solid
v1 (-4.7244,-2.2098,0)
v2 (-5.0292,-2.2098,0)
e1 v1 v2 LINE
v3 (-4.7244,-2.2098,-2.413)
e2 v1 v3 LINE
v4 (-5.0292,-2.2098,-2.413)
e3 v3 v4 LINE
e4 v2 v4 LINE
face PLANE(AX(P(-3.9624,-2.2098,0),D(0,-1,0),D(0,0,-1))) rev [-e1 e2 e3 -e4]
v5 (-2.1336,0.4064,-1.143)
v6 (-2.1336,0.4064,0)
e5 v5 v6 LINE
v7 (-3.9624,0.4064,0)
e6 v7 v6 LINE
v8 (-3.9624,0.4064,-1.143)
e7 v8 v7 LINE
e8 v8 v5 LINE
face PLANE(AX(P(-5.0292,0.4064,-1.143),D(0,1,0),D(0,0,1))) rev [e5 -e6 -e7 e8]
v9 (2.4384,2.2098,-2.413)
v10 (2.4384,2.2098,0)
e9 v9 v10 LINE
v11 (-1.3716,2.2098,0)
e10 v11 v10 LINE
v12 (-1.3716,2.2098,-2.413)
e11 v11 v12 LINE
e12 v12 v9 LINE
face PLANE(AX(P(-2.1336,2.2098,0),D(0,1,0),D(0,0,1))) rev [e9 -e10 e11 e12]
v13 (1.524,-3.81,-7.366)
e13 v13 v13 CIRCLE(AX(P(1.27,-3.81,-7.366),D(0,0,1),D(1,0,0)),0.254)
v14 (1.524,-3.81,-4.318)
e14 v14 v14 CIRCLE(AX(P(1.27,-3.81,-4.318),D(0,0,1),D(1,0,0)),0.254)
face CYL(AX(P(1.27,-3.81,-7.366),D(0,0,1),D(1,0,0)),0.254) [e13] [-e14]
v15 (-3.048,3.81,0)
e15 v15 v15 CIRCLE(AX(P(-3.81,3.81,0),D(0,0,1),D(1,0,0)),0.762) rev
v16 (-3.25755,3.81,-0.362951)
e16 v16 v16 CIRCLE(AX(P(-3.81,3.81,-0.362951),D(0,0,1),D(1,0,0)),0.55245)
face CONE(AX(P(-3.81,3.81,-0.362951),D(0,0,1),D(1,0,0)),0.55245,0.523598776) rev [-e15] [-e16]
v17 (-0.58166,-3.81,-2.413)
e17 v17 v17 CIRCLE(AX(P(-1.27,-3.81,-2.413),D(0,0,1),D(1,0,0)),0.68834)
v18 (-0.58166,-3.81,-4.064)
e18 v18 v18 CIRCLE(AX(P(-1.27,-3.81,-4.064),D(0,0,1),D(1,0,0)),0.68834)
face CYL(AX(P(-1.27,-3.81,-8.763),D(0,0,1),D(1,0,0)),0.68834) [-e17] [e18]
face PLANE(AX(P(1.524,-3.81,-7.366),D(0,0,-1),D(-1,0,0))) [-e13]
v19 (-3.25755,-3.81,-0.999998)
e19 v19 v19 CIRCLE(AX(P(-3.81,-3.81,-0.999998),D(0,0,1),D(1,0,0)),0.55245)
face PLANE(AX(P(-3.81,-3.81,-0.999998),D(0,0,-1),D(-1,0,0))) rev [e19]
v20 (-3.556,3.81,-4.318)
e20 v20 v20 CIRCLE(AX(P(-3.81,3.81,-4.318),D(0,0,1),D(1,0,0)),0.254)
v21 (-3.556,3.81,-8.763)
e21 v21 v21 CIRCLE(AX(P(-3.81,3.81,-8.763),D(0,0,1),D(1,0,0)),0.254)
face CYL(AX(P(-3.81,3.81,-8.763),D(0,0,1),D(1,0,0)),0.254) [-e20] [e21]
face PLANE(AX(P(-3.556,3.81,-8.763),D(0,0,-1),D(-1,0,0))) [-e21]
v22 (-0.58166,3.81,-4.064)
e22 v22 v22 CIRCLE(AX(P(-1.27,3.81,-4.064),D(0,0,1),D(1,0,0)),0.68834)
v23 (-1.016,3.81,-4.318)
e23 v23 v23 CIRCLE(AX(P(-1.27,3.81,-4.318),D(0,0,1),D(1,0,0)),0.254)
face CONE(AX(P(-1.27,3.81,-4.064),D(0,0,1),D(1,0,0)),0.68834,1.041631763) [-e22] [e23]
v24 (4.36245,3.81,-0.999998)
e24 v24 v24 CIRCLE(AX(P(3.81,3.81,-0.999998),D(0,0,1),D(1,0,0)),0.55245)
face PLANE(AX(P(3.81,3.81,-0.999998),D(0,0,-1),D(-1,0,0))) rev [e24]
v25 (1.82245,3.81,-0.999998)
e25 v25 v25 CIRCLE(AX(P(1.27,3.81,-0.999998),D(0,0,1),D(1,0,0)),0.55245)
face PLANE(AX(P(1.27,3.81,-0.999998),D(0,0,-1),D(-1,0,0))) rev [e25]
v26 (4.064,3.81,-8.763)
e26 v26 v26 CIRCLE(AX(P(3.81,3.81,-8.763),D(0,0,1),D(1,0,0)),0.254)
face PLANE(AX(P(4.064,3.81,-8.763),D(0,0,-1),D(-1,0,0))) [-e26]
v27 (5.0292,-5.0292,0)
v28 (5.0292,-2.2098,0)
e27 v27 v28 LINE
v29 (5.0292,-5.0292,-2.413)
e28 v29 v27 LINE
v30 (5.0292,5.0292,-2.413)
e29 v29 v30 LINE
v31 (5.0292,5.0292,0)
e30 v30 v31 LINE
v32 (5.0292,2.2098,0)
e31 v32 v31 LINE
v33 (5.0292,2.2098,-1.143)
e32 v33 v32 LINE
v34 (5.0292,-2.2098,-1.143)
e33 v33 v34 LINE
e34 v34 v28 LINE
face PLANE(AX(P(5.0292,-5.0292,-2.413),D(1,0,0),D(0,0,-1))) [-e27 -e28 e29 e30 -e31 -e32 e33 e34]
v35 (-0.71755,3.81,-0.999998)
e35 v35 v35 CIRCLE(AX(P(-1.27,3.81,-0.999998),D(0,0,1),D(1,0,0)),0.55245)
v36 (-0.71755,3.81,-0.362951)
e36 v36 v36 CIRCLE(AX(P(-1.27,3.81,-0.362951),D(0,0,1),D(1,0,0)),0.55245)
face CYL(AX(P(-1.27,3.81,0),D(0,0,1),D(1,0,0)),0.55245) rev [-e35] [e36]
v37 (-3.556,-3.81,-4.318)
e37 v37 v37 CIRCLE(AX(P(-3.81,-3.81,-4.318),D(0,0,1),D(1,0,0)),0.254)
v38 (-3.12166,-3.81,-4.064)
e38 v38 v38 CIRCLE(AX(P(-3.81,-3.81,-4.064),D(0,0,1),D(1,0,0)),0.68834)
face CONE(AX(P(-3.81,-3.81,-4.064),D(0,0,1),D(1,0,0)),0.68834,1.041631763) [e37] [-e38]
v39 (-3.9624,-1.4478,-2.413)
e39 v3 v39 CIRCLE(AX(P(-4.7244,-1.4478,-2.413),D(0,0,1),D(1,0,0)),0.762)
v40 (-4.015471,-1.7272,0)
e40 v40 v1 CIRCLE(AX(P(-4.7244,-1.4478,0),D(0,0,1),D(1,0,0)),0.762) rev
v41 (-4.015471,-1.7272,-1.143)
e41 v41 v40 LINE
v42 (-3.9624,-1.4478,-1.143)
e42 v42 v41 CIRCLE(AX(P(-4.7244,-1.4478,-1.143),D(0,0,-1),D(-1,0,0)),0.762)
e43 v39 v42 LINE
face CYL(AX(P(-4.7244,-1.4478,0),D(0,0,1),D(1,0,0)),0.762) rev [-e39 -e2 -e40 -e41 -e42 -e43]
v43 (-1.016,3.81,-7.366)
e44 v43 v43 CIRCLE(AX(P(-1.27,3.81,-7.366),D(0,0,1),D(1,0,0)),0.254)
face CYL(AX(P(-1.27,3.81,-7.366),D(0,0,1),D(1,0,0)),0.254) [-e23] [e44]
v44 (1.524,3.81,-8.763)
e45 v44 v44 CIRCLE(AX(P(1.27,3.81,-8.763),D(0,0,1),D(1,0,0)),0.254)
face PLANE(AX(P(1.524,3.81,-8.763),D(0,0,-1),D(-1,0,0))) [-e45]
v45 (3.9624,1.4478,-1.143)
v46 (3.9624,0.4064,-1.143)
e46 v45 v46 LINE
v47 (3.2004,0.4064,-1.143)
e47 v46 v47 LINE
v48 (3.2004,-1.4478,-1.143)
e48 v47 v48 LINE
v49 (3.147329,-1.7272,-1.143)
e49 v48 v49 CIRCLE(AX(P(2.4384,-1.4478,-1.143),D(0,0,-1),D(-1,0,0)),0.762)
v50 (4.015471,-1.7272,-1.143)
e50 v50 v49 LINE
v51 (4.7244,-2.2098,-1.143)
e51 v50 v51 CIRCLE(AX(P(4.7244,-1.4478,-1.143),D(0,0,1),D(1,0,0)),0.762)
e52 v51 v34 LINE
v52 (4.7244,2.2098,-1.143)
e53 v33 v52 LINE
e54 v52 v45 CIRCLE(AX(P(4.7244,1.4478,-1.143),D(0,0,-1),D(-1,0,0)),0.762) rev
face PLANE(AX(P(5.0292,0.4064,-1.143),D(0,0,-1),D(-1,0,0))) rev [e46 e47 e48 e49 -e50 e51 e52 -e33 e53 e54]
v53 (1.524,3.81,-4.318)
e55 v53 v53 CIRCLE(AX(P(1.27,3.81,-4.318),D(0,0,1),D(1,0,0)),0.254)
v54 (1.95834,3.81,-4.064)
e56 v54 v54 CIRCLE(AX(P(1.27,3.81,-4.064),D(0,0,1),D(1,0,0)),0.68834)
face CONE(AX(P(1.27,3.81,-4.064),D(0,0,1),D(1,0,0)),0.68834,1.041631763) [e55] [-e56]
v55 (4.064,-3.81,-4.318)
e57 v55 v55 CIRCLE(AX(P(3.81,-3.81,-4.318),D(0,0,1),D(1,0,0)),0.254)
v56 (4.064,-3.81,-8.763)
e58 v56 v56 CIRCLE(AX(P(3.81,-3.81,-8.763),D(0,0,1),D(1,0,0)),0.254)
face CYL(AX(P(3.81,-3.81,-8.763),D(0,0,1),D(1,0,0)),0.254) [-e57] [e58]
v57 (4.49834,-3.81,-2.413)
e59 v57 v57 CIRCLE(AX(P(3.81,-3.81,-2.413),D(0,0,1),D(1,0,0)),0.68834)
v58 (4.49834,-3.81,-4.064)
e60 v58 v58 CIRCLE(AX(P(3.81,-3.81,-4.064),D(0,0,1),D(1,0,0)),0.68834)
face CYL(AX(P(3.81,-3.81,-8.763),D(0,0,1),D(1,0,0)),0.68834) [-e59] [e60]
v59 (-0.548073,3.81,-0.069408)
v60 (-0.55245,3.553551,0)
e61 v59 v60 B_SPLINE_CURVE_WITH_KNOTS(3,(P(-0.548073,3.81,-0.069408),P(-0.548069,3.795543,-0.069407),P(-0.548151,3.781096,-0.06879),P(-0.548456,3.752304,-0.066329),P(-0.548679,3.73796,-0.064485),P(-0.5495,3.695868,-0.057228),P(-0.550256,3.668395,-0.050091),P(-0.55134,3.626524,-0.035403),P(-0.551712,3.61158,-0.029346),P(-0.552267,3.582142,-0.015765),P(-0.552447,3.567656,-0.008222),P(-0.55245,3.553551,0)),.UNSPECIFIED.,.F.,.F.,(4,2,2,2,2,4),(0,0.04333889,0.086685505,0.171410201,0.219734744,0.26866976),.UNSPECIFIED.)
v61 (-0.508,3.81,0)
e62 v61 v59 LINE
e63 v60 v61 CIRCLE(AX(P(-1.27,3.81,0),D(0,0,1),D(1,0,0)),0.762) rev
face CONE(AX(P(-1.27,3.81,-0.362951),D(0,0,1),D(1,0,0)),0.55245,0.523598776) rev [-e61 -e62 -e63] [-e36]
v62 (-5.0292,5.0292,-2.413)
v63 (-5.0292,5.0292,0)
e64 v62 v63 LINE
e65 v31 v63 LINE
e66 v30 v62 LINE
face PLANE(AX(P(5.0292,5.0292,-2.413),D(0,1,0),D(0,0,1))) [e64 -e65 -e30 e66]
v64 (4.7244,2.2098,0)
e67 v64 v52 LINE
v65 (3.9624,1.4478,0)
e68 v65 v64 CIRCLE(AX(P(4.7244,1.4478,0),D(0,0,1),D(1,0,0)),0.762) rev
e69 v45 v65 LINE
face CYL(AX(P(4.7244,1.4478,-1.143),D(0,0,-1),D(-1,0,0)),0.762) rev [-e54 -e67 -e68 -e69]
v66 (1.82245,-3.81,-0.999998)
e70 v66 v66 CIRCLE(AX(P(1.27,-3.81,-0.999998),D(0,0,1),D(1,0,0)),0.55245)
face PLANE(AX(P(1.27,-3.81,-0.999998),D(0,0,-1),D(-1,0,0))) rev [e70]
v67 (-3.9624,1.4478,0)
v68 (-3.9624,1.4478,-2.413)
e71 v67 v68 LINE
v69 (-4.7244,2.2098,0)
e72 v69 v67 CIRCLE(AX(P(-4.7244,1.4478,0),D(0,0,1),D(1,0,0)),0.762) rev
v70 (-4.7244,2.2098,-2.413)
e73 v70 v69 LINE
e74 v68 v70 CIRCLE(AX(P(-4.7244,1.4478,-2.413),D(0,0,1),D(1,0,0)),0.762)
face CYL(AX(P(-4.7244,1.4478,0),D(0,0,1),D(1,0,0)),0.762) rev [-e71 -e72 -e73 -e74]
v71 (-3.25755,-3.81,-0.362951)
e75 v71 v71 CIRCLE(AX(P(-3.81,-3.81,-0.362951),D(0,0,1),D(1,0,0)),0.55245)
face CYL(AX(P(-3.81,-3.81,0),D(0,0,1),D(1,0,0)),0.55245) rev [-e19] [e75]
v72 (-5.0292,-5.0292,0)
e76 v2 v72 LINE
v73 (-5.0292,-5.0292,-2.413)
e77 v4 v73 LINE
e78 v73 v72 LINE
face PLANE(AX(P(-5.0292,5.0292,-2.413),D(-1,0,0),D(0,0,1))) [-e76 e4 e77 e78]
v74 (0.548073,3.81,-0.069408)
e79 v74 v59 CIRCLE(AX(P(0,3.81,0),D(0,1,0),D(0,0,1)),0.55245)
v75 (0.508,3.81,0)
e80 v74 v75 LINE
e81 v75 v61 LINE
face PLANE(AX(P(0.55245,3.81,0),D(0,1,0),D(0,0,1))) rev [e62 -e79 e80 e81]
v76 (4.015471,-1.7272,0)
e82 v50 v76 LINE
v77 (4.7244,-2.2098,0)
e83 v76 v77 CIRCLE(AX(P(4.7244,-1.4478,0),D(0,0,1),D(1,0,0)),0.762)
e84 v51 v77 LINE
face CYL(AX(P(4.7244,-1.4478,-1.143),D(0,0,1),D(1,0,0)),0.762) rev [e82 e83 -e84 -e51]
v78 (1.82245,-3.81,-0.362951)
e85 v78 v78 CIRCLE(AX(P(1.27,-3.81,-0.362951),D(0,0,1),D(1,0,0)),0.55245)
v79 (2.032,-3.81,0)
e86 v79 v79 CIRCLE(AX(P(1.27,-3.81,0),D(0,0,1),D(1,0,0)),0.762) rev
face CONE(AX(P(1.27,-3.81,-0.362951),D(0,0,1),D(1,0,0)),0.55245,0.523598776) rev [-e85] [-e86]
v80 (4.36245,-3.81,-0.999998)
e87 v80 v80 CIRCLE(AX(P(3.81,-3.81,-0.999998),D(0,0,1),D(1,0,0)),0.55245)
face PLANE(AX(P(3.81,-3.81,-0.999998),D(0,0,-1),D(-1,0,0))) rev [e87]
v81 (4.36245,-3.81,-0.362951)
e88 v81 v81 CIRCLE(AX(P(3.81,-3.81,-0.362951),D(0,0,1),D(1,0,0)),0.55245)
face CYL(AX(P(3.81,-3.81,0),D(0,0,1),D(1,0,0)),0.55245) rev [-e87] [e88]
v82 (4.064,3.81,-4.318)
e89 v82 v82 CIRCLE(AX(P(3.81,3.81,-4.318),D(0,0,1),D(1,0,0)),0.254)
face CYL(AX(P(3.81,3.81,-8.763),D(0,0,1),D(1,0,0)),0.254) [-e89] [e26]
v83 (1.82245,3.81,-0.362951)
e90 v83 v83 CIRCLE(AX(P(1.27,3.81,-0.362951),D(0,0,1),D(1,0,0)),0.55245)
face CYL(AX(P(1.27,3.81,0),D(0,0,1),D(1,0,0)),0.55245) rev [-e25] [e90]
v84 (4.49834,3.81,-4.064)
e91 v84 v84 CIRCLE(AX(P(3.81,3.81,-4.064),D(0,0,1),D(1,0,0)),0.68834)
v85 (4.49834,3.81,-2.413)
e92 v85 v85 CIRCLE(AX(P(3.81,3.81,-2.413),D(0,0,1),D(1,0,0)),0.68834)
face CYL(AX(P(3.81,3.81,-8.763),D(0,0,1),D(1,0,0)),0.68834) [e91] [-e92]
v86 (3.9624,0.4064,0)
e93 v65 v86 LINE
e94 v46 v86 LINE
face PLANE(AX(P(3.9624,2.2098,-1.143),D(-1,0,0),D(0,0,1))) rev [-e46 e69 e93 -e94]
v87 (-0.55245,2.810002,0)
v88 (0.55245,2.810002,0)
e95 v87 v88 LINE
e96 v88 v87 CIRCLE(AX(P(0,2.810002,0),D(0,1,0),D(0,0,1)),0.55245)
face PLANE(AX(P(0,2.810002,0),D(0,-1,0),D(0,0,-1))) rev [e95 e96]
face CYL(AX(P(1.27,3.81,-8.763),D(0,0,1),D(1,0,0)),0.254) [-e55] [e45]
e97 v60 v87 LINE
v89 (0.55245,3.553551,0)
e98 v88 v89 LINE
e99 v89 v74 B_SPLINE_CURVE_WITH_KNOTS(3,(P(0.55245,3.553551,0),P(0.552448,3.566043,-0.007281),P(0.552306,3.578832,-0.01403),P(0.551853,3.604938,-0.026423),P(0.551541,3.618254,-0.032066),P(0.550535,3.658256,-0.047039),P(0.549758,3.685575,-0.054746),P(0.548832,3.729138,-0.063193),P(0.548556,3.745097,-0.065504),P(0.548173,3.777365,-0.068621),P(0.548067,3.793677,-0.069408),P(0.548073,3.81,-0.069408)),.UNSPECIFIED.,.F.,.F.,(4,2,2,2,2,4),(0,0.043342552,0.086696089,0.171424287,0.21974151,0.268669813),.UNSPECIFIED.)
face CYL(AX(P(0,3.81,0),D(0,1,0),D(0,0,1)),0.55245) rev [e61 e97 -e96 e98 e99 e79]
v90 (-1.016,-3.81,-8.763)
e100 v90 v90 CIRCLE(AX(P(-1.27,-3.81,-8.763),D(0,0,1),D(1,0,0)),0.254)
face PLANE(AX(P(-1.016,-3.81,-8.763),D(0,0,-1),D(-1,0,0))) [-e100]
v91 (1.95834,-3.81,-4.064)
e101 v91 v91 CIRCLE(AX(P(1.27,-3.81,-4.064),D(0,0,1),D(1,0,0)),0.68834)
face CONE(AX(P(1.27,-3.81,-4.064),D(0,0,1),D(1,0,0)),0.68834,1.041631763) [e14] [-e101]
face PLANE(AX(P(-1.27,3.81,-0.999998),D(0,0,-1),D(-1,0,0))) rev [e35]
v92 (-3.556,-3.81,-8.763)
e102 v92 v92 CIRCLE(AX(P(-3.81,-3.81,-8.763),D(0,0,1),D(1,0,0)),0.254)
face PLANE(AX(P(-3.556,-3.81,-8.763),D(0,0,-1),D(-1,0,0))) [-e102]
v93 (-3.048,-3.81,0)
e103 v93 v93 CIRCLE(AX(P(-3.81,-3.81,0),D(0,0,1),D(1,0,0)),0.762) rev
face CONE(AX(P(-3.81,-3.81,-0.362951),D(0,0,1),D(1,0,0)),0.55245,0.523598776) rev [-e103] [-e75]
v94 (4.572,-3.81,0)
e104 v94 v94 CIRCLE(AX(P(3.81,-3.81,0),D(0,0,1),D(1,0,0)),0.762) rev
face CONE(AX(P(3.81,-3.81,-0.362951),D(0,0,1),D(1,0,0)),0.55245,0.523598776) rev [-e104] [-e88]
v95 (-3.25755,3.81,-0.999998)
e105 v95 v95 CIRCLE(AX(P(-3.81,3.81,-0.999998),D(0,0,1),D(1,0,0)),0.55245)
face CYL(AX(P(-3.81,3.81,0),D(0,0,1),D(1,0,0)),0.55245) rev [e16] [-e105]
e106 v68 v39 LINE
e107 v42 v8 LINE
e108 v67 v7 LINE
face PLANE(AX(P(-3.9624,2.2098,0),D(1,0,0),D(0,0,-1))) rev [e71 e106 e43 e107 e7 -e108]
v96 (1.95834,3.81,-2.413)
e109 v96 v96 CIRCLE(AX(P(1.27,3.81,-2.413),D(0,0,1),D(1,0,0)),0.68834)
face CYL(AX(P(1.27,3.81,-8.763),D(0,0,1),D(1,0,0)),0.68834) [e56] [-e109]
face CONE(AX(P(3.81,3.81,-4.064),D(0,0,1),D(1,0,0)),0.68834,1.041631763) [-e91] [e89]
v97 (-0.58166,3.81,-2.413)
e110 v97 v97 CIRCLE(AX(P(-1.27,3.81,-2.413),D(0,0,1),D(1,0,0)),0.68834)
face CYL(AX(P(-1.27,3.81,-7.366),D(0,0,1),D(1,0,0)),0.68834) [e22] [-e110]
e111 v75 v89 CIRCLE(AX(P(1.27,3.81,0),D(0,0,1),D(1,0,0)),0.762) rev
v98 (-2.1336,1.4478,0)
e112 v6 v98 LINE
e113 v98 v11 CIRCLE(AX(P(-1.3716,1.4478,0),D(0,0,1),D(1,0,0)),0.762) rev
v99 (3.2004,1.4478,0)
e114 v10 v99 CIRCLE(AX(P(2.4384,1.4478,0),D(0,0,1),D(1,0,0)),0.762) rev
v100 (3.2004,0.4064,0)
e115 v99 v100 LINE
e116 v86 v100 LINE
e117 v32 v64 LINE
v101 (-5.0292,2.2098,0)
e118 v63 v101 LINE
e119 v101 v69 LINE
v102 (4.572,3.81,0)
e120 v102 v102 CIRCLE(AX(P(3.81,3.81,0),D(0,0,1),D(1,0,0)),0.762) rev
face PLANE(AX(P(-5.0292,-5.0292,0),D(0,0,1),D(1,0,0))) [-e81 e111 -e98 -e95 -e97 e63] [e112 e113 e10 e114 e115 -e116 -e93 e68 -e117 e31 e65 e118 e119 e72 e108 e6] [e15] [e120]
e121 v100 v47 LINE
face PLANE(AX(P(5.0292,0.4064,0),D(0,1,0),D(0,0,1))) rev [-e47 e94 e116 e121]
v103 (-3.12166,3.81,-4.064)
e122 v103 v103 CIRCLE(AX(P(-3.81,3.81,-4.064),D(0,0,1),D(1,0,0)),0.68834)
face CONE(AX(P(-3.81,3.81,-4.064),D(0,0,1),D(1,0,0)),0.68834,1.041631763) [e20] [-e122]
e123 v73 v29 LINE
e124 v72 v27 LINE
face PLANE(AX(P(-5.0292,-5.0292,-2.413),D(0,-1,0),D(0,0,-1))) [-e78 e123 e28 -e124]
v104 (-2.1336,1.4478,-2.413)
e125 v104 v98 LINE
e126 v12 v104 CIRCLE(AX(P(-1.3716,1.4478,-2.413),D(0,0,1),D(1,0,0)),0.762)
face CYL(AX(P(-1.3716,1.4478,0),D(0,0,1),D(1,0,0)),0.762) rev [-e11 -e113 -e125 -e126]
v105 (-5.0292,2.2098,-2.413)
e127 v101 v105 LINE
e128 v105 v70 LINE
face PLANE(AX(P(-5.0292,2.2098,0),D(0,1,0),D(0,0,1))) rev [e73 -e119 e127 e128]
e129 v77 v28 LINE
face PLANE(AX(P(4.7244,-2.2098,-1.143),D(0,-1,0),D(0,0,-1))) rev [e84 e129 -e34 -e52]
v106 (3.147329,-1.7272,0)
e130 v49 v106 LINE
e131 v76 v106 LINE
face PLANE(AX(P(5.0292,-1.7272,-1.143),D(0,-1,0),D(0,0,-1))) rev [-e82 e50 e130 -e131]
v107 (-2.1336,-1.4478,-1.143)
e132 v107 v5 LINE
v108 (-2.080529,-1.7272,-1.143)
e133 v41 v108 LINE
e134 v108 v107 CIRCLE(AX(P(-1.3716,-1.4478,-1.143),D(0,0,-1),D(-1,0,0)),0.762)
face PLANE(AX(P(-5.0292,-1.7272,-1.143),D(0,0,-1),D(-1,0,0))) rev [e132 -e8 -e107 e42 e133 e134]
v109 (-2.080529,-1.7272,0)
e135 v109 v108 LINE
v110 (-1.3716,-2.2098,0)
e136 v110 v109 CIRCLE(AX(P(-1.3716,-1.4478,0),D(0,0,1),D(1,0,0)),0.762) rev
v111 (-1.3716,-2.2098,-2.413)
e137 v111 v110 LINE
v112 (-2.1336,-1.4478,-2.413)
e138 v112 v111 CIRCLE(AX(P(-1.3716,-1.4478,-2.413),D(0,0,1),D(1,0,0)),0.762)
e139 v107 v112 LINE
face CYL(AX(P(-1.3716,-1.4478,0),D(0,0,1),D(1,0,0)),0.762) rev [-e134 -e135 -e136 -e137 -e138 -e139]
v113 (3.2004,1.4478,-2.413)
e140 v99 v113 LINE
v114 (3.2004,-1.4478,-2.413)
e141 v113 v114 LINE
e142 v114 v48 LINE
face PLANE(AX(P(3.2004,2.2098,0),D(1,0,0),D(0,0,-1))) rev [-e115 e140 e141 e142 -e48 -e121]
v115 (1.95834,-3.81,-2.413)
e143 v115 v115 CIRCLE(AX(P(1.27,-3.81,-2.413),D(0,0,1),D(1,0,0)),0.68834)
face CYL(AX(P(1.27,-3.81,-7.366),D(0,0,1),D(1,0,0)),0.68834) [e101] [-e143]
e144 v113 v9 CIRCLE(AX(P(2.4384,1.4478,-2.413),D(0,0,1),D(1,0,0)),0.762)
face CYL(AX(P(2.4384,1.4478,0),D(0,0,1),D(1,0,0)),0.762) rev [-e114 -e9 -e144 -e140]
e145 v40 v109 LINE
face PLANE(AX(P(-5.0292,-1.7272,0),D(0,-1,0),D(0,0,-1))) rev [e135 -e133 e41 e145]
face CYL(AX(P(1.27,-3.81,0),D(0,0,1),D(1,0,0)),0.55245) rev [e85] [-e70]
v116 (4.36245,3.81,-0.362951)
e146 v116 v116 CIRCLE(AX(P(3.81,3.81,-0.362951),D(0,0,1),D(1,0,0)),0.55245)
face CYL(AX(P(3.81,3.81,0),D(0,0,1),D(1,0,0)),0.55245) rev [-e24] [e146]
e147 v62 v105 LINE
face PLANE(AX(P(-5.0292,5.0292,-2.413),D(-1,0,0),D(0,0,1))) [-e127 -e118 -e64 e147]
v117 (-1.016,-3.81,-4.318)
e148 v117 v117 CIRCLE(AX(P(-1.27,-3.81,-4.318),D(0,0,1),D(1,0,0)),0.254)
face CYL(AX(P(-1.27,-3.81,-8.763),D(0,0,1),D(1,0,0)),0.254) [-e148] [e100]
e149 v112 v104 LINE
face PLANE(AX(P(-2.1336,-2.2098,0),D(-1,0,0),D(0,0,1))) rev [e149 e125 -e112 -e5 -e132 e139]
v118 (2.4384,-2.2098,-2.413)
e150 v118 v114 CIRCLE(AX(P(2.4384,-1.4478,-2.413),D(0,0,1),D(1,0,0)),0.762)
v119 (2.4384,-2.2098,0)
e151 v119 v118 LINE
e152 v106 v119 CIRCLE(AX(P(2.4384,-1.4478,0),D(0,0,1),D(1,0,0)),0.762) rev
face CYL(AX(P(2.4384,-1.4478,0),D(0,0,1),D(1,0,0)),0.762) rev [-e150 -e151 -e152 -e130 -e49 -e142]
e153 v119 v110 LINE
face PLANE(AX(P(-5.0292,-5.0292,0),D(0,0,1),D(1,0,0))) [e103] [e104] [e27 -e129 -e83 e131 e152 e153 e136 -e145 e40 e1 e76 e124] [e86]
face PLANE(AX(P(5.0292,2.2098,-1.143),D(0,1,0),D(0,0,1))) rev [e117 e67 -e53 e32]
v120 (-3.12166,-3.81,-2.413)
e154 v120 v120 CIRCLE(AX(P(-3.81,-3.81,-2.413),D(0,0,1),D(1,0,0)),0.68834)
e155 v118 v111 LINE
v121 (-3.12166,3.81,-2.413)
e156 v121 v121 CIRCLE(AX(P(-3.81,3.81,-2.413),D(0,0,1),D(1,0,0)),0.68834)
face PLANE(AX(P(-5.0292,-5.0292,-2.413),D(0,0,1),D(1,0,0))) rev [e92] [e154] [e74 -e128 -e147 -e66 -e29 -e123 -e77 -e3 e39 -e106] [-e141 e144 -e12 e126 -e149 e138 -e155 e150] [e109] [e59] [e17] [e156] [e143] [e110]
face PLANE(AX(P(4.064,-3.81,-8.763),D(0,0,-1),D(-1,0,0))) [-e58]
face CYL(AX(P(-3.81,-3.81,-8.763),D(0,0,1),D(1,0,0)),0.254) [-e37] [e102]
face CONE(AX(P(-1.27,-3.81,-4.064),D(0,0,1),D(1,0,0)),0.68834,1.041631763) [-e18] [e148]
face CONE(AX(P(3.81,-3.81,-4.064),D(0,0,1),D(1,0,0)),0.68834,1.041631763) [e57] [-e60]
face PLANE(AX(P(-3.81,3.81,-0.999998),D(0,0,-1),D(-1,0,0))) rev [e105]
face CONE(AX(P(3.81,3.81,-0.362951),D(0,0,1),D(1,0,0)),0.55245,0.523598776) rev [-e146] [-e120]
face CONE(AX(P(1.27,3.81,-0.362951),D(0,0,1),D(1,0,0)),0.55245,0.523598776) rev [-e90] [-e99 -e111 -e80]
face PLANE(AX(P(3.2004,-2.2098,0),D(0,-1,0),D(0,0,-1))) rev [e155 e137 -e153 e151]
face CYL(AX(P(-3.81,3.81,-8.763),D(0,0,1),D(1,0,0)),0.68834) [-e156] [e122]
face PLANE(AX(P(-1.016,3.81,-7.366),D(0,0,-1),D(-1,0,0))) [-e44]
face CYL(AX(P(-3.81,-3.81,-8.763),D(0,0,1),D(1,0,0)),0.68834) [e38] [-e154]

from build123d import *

# Parameters (mm, degrees)
ESQUISSE1_W             = 10.0584
ESQUISSE1_H             = 10.0584
BOSS_EXTRU_1_DEPTH      = 2.413
ESQUISSE2_W             = 5.334
ESQUISSE2_H             = 4.4196
ENL_V_MAT_EXTRU_1_DEPTH = 8.510544207
ESQUISSE3_W             = 1.143
ESQUISSE3_H             = 2.1336
ENL_V_MAT_EXTRU_2_DEPTH = 10.941918215
ESQUISSE4_W             = 1.0668
ESQUISSE4_H             = 1.8034
ENL_V_MAT_EXTRU_3_DEPTH = 1.143
ENL_V_MAT_EXTRU_4_DEPTH = 1.143
ESQUISSE6_W             = 1.0668
ESQUISSE6_H             = 4.4196
ENL_V_MAT_EXTRU_5_DEPTH = 8.510544207
ESQUISSE7_W             = 1.143
ESQUISSE7_H             = 2.1336
ENL_V_MAT_EXTRU_6_DEPTH = 10.078608125
PER_AGE1_D              = 1.1049
PER_AGE1_DEPTH          = 0.999998
PER_AGE2_D              = 1.1049
PER_AGE2_DEPTH          = 0.999998
PER_AGE3_D              = 1.1049
PER_AGE3_DEPTH          = 0.999998
ESQUISSE22_W            = 0.55245
ESQUISSE22_H            = 0.999998
PER_AGE5_D              = 1.1049
PER_AGE5_DEPTH          = 0.999998
PER_AGE6_D              = 1.1049
PER_AGE6_DEPTH          = 0.999998
PER_AGE7_D              = 1.1049
PER_AGE7_DEPTH          = 0.999998
PER_AGE8_D              = 1.1049
PER_AGE8_DEPTH          = 0.999998
CHANFREIN1_SIZE         = 0.20955
CHANFREIN1_SIZE2        = 0.362951247
CHANFREIN2_SIZE         = 0.20955
CHANFREIN2_SIZE2        = 0.362951247
CHANFREIN3_SIZE         = 0.20955
CHANFREIN3_SIZE2        = 0.362951247
CHANFREIN4_SIZE         = 0.20955
CHANFREIN4_SIZE2        = 0.362951247
CHANFREIN5_SIZE         = 0.20955
CHANFREIN5_SIZE_2       = 0.362951247
CHANFREIN6_SIZE         = 0.20955
CHANFREIN6_SIZE2        = 0.362951247
CHANFREIN7_SIZE         = 0.20955
CHANFREIN7_SIZE_2       = 0.362951247
CONG_1_R                = 0.762
CONG_2_R                = 0.762
CONG_3_R                = 0.762
CONG_4_R                = 0.762
CONG_5_R                = 0.762
CONG_6_R                = 0.762
CONG_7_R                = 0.762


with BuildPart() as part:
    # Esquisse1 → Boss.-Extru.1 (new body)
    with BuildSketch(Plane.XY):
        Rectangle(ESQUISSE1_W, ESQUISSE1_H)
    extrude(amount=-BOSS_EXTRU_1_DEPTH)

    # Esquisse2 → Enlèv. mat.-Extru.1 (cut, through all)
    with BuildSketch(Plane(origin=(0, 0, -2.413), x_dir=(-1, 0, 0), z_dir=(0, 0, -1))):
        with Locations((-0.5334, 0)):
            Rectangle(ESQUISSE2_W, ESQUISSE2_H)
    extrude(amount=-ENL_V_MAT_EXTRU_1_DEPTH, mode=Mode.SUBTRACT)

    # Esquisse3 → Enlèv. mat.-Extru.2 (cut, through all)
    with BuildSketch(Plane.ZY.offset(-3.2004)):
        with Locations((-0.5715, -0.6604)):
            Rectangle(ESQUISSE3_W, ESQUISSE3_H)
    extrude(amount=-ENL_V_MAT_EXTRU_2_DEPTH, mode=Mode.SUBTRACT)

    # Esquisse4 → Enlèv. mat.-Extru.3 (cut)
    with BuildSketch(Plane.XY):
        with Locations((4.4958, 1.3081)):
            Rectangle(ESQUISSE4_W, ESQUISSE4_H)
    extrude(amount=-ENL_V_MAT_EXTRU_3_DEPTH, mode=Mode.SUBTRACT)

    # Esquisse5 → Enlèv. mat.-Extru.4 (cut)
    with BuildSketch(Plane.XY):
        with BuildLine():
            Line((5.0292, -1.7272), (4.015471485, -1.7272))
            ThreePointArc((4.015471485, -1.7272), (4.295598647, -2.077699516), (4.7244, -2.2098))
            Line((4.7244, -2.2098), (5.0292, -2.2098))
            Line((5.0292, -2.2098), (5.0292, -1.7272))
        make_face()
    extrude(amount=-ENL_V_MAT_EXTRU_4_DEPTH, mode=Mode.SUBTRACT)

    # Esquisse6 → Enlèv. mat.-Extru.5 (cut, through all)
    with BuildSketch(Plane(origin=(0, 0, -2.413), x_dir=(-1, 0, 0), z_dir=(0, 0, -1))):
        with Locations((4.4958, 0)):
            Rectangle(ESQUISSE6_W, ESQUISSE6_H)
    extrude(amount=-ENL_V_MAT_EXTRU_5_DEPTH, mode=Mode.SUBTRACT)

    # Esquisse7 → Enlèv. mat.-Extru.6 (cut, through all)
    with BuildSketch(Plane(origin=(-2.1336, 0, 0), x_dir=(0, 0, -1), z_dir=(1, 0, 0))):
        with Locations((0.5715, -0.6604)):
            Rectangle(ESQUISSE7_W, ESQUISSE7_H)
    extrude(amount=-ENL_V_MAT_EXTRU_6_DEPTH, mode=Mode.SUBTRACT)

    # Esquisse8 → Révolution1 (revolve)
    with BuildSketch(Plane(origin=(0, -3.81, 0), x_dir=(-1, 0, 0), z_dir=(0, 1, 0))):
        Polygon((-4.064, -8.763), (-3.81, -8.763), (-3.81, -2.413), (-4.49834, -2.413), (-4.49834, -4.064), (-4.064, -4.318), align=None)
    revolve(axis=Axis((3.81, -3.81, -8.763), (0, 0, 1)))

    # Esquisse9 → Révolution2 (revolve)
    with BuildSketch(Plane(origin=(0, -3.81, 0), x_dir=(-1, 0, 0), z_dir=(0, 1, 0))):
        Polygon((-1.524, -7.366), (-1.27, -7.366), (-1.27, -2.413), (-1.95834, -2.413), (-1.95834, -4.064), (-1.524, -4.318), align=None)
    revolve(axis=Axis((1.27, -3.81, -7.366), (0, 0, 1)))

    # Esquisse10 → Révolution3 (revolve)
    with BuildSketch(Plane(origin=(0, -3.81, 0), x_dir=(-1, 0, 0), z_dir=(0, 1, 0))):
        Polygon((1.016, -8.763), (1.27, -8.763), (1.27, -2.413), (0.58166, -2.413), (0.58166, -4.064), (1.016, -4.318), align=None)
    revolve(axis=Axis((-1.27, -3.81, -8.763), (0, 0, 1)))

    # Esquisse11 → Révolution4 (revolve)
    with BuildSketch(Plane(origin=(0, -3.81, 0), x_dir=(-1, 0, 0), z_dir=(0, 1, 0))):
        Polygon((3.556, -8.763), (3.81, -8.763), (3.81, -2.413), (3.12166, -2.413), (3.12166, -4.064), (3.556, -4.318), align=None)
    revolve(axis=Axis((-3.81, -3.81, -8.763), (0, 0, 1)))

    # Esquisse12 → Révolution5 (revolve)
    with BuildSketch(Plane(origin=(0, 3.81, 0), x_dir=(-1, 0, 0), z_dir=(0, 1, 0))):
        Polygon((-4.064, -8.763), (-3.81, -8.763), (-3.81, -2.413), (-4.49834, -2.413), (-4.49834, -4.064), (-4.064, -4.318), align=None)
    revolve(axis=Axis((3.81, 3.81, -8.763), (0, 0, 1)))

    # Esquisse13 → Révolution6 (revolve)
    with BuildSketch(Plane(origin=(0, 3.81, 0), x_dir=(-1, 0, 0), z_dir=(0, 1, 0))):
        Polygon((-1.524, -8.763), (-1.27, -8.763), (-1.27, -2.413), (-1.95834, -2.413), (-1.95834, -4.064), (-1.524, -4.318), align=None)
    revolve(axis=Axis((1.27, 3.81, -8.763), (0, 0, 1)))

    # Esquisse14 → Révolution7 (revolve)
    with BuildSketch(Plane(origin=(0, 3.81, 0), x_dir=(-1, 0, 0), z_dir=(0, 1, 0))):
        Polygon((1.016, -7.366), (1.27, -7.366), (1.27, -2.413), (0.58166, -2.413), (0.58166, -4.064), (1.016, -4.318), align=None)
    revolve(axis=Axis((-1.27, 3.81, -7.366), (0, 0, 1)))

    # Esquisse15 → Révolution8 (revolve)
    with BuildSketch(Plane(origin=(0, 3.81, 0), x_dir=(-1, 0, 0), z_dir=(0, 1, 0))):
        Polygon((3.556, -8.763), (3.81, -8.763), (3.81, -2.413), (3.12166, -2.413), (3.12166, -4.064), (3.556, -4.318), align=None)
    revolve(axis=Axis((-3.81, 3.81, -8.763), (0, 0, 1)))

    # Perçage1
    with Locations(Plane.XY):
        with Locations((3.81, -3.81)):
            Hole(PER_AGE1_D / 2, depth=PER_AGE1_DEPTH)

    # Perçage2
    with Locations(Plane.XY):
        with Locations((-3.81, 3.81)):
            Hole(PER_AGE2_D / 2, depth=PER_AGE2_DEPTH)

    # Perçage3
    with Locations(Plane.XY):
        with Locations((1.27, -3.81)):
            Hole(PER_AGE3_D / 2, depth=PER_AGE3_DEPTH)

    # Esquisse22 → Perçage4 (revolve, cut)
    with BuildSketch(Plane(origin=(0, 3.81, 0), x_dir=(0, 0, 1), z_dir=(1, 0, 0))):
        with Locations((0.276225, 0.499999)):
            Rectangle(ESQUISSE22_W, ESQUISSE22_H)
    revolve(axis=Axis((0, -106.19, 0), (0, 1, 0)), mode=Mode.SUBTRACT)

    # Perçage5
    with Locations(Plane.XY):
        with Locations((-3.81, -3.81)):
            Hole(PER_AGE5_D / 2, depth=PER_AGE5_DEPTH)

    # Perçage6
    with Locations(Plane.XY):
        with Locations((1.27, 3.81)):
            Hole(PER_AGE6_D / 2, depth=PER_AGE6_DEPTH)

    # Perçage7
    with Locations(Plane.XY):
        with Locations((3.81, 3.81)):
            Hole(PER_AGE7_D / 2, depth=PER_AGE7_DEPTH)

    # Perçage8
    with Locations(Plane.XY):
        with Locations((-1.27, 3.81)):
            Hole(PER_AGE8_D / 2, depth=PER_AGE8_DEPTH)

    # Chanfrein1
    chanfrein1_edges = [part.edges().sort_by_distance(p)[0] for p in [
        (4.36245, -3.81, 0),
    ]]
    chanfrein1_side = [part.faces().sort_by_distance(p)[0] for p in [
        (-0.07802689, -3.515242334, 0),
    ]]
    chamfer(chanfrein1_edges, length=CHANFREIN1_SIZE, length2=CHANFREIN1_SIZE2, reference=chanfrein1_side[0])

    # Chanfrein2
    chanfrein2_edges = [part.edges().sort_by_distance(p)[0] for p in [
        (-3.25755, 3.81, 0),
    ]]
    chanfrein2_side = [part.faces().sort_by_distance(p)[0] for p in [
        (4.4958, 2.32049855, 0),
    ]]
    chamfer(chanfrein2_edges, length=CHANFREIN2_SIZE, length2=CHANFREIN2_SIZE2, reference=chanfrein2_side[0])

    # Chanfrein3
    chanfrein3_edges = [part.edges().sort_by_distance(p)[0] for p in [
        (1.82245, -3.81, 0),
    ]]
    chanfrein3_side = [part.faces().sort_by_distance(p)[0] for p in [
        (-0.207492952, -3.505427301, 0),
    ]]
    chamfer(chanfrein3_edges, length=CHANFREIN3_SIZE, length2=CHANFREIN3_SIZE2, reference=chanfrein3_side[0])

    # Chanfrein4
    chanfrein4_edges = [part.edges().sort_by_distance(p)[0] for p in [
        (-3.25755, -3.81, 0),
    ]]
    chanfrein4_side = [part.faces().sort_by_distance(p)[0] for p in [
        (-0.258386154, -3.494936097, 0),
    ]]
    chamfer(chanfrein4_edges, length=CHANFREIN4_SIZE, length2=CHANFREIN4_SIZE2, reference=chanfrein4_side[0])

    # Chanfrein5
    # the kernel refuses this chamfer: 0.362951247, 0.20955 mm, written as the material it takes off along each edge
    with BuildSketch(Plane(origin=(1.27, 3.81, 0), x_dir=(-1, 0, 0), z_dir=(0, -1, 0))) as chanfrein5_piece_1:
        Polygon((0.55245 + CHANFREIN5_SIZE, 0), (0.55245, CHANFREIN5_SIZE_2), (0.55245, 0), align=None)
    revolve(axis=Axis((1.27, 3.81, 0), (0, 0, -1)), mode=Mode.SUBTRACT)

    # Chanfrein6
    chanfrein6_edges = [part.edges().sort_by_distance(p)[0] for p in [
        (4.36245, 3.81, 0),
    ]]
    chanfrein6_side = [part.faces().sort_by_distance(p)[0] for p in [
        (4.4958, 2.32049855, 0),
    ]]
    chamfer(chanfrein6_edges, length=CHANFREIN6_SIZE, length2=CHANFREIN6_SIZE2, reference=chanfrein6_side[0])

    # Chanfrein7
    # the kernel refuses this chamfer: 0.362951247, 0.20955 mm, written as the material it takes off along each edge
    with BuildSketch(Plane(origin=(-1.27, 3.81, 0), x_dir=(-1, 0, 0), z_dir=(0, -1, 0))) as chanfrein7_piece_1:
        Polygon((0.55245 + CHANFREIN7_SIZE, 0), (0.55245, CHANFREIN7_SIZE_2), (0.55245, 0), align=None)
    revolve(axis=Axis((-1.27, 3.81, 0), (0, 0, -1)), mode=Mode.SUBTRACT)

    # Congé1
    cong_1_edges = [part.edges().sort_by_distance(p)[0] for p in [
        (-2.1336, -2.2098, -1.2065),
    ]]
    fillet(cong_1_edges, radius=CONG_1_R)

    # Congé2
    cong_2_edges = [part.edges().sort_by_distance(p)[0] for p in [
        (-3.9624, -2.2098, -1.2065),
    ]]
    fillet(cong_2_edges, radius=CONG_2_R)

    # Congé3
    cong_3_edges = [part.edges().sort_by_distance(p)[0] for p in [
        (-2.1336, 2.2098, -1.2065),
    ]]
    fillet(cong_3_edges, radius=CONG_3_R)

    # Congé4
    cong_4_edges = [part.edges().sort_by_distance(p)[0] for p in [
        (-3.9624, 2.2098, -1.2065),
    ]]
    fillet(cong_4_edges, radius=CONG_4_R)

    # Congé5
    cong_5_edges = [part.edges().sort_by_distance(p)[0] for p in [
        (3.2004, -2.2098, -1.2065),
    ]]
    fillet(cong_5_edges, radius=CONG_5_R)

    # Congé6
    cong_6_edges = [part.edges().sort_by_distance(p)[0] for p in [
        (3.9624, 2.2098, -0.5715),
    ]]
    fillet(cong_6_edges, radius=CONG_6_R)

    # Congé7
    cong_7_edges = [part.edges().sort_by_distance(p)[0] for p in [
        (3.2004, 2.2098, -1.2065),
    ]]
    fillet(cong_7_edges, radius=CONG_7_R)


solid = part.part
